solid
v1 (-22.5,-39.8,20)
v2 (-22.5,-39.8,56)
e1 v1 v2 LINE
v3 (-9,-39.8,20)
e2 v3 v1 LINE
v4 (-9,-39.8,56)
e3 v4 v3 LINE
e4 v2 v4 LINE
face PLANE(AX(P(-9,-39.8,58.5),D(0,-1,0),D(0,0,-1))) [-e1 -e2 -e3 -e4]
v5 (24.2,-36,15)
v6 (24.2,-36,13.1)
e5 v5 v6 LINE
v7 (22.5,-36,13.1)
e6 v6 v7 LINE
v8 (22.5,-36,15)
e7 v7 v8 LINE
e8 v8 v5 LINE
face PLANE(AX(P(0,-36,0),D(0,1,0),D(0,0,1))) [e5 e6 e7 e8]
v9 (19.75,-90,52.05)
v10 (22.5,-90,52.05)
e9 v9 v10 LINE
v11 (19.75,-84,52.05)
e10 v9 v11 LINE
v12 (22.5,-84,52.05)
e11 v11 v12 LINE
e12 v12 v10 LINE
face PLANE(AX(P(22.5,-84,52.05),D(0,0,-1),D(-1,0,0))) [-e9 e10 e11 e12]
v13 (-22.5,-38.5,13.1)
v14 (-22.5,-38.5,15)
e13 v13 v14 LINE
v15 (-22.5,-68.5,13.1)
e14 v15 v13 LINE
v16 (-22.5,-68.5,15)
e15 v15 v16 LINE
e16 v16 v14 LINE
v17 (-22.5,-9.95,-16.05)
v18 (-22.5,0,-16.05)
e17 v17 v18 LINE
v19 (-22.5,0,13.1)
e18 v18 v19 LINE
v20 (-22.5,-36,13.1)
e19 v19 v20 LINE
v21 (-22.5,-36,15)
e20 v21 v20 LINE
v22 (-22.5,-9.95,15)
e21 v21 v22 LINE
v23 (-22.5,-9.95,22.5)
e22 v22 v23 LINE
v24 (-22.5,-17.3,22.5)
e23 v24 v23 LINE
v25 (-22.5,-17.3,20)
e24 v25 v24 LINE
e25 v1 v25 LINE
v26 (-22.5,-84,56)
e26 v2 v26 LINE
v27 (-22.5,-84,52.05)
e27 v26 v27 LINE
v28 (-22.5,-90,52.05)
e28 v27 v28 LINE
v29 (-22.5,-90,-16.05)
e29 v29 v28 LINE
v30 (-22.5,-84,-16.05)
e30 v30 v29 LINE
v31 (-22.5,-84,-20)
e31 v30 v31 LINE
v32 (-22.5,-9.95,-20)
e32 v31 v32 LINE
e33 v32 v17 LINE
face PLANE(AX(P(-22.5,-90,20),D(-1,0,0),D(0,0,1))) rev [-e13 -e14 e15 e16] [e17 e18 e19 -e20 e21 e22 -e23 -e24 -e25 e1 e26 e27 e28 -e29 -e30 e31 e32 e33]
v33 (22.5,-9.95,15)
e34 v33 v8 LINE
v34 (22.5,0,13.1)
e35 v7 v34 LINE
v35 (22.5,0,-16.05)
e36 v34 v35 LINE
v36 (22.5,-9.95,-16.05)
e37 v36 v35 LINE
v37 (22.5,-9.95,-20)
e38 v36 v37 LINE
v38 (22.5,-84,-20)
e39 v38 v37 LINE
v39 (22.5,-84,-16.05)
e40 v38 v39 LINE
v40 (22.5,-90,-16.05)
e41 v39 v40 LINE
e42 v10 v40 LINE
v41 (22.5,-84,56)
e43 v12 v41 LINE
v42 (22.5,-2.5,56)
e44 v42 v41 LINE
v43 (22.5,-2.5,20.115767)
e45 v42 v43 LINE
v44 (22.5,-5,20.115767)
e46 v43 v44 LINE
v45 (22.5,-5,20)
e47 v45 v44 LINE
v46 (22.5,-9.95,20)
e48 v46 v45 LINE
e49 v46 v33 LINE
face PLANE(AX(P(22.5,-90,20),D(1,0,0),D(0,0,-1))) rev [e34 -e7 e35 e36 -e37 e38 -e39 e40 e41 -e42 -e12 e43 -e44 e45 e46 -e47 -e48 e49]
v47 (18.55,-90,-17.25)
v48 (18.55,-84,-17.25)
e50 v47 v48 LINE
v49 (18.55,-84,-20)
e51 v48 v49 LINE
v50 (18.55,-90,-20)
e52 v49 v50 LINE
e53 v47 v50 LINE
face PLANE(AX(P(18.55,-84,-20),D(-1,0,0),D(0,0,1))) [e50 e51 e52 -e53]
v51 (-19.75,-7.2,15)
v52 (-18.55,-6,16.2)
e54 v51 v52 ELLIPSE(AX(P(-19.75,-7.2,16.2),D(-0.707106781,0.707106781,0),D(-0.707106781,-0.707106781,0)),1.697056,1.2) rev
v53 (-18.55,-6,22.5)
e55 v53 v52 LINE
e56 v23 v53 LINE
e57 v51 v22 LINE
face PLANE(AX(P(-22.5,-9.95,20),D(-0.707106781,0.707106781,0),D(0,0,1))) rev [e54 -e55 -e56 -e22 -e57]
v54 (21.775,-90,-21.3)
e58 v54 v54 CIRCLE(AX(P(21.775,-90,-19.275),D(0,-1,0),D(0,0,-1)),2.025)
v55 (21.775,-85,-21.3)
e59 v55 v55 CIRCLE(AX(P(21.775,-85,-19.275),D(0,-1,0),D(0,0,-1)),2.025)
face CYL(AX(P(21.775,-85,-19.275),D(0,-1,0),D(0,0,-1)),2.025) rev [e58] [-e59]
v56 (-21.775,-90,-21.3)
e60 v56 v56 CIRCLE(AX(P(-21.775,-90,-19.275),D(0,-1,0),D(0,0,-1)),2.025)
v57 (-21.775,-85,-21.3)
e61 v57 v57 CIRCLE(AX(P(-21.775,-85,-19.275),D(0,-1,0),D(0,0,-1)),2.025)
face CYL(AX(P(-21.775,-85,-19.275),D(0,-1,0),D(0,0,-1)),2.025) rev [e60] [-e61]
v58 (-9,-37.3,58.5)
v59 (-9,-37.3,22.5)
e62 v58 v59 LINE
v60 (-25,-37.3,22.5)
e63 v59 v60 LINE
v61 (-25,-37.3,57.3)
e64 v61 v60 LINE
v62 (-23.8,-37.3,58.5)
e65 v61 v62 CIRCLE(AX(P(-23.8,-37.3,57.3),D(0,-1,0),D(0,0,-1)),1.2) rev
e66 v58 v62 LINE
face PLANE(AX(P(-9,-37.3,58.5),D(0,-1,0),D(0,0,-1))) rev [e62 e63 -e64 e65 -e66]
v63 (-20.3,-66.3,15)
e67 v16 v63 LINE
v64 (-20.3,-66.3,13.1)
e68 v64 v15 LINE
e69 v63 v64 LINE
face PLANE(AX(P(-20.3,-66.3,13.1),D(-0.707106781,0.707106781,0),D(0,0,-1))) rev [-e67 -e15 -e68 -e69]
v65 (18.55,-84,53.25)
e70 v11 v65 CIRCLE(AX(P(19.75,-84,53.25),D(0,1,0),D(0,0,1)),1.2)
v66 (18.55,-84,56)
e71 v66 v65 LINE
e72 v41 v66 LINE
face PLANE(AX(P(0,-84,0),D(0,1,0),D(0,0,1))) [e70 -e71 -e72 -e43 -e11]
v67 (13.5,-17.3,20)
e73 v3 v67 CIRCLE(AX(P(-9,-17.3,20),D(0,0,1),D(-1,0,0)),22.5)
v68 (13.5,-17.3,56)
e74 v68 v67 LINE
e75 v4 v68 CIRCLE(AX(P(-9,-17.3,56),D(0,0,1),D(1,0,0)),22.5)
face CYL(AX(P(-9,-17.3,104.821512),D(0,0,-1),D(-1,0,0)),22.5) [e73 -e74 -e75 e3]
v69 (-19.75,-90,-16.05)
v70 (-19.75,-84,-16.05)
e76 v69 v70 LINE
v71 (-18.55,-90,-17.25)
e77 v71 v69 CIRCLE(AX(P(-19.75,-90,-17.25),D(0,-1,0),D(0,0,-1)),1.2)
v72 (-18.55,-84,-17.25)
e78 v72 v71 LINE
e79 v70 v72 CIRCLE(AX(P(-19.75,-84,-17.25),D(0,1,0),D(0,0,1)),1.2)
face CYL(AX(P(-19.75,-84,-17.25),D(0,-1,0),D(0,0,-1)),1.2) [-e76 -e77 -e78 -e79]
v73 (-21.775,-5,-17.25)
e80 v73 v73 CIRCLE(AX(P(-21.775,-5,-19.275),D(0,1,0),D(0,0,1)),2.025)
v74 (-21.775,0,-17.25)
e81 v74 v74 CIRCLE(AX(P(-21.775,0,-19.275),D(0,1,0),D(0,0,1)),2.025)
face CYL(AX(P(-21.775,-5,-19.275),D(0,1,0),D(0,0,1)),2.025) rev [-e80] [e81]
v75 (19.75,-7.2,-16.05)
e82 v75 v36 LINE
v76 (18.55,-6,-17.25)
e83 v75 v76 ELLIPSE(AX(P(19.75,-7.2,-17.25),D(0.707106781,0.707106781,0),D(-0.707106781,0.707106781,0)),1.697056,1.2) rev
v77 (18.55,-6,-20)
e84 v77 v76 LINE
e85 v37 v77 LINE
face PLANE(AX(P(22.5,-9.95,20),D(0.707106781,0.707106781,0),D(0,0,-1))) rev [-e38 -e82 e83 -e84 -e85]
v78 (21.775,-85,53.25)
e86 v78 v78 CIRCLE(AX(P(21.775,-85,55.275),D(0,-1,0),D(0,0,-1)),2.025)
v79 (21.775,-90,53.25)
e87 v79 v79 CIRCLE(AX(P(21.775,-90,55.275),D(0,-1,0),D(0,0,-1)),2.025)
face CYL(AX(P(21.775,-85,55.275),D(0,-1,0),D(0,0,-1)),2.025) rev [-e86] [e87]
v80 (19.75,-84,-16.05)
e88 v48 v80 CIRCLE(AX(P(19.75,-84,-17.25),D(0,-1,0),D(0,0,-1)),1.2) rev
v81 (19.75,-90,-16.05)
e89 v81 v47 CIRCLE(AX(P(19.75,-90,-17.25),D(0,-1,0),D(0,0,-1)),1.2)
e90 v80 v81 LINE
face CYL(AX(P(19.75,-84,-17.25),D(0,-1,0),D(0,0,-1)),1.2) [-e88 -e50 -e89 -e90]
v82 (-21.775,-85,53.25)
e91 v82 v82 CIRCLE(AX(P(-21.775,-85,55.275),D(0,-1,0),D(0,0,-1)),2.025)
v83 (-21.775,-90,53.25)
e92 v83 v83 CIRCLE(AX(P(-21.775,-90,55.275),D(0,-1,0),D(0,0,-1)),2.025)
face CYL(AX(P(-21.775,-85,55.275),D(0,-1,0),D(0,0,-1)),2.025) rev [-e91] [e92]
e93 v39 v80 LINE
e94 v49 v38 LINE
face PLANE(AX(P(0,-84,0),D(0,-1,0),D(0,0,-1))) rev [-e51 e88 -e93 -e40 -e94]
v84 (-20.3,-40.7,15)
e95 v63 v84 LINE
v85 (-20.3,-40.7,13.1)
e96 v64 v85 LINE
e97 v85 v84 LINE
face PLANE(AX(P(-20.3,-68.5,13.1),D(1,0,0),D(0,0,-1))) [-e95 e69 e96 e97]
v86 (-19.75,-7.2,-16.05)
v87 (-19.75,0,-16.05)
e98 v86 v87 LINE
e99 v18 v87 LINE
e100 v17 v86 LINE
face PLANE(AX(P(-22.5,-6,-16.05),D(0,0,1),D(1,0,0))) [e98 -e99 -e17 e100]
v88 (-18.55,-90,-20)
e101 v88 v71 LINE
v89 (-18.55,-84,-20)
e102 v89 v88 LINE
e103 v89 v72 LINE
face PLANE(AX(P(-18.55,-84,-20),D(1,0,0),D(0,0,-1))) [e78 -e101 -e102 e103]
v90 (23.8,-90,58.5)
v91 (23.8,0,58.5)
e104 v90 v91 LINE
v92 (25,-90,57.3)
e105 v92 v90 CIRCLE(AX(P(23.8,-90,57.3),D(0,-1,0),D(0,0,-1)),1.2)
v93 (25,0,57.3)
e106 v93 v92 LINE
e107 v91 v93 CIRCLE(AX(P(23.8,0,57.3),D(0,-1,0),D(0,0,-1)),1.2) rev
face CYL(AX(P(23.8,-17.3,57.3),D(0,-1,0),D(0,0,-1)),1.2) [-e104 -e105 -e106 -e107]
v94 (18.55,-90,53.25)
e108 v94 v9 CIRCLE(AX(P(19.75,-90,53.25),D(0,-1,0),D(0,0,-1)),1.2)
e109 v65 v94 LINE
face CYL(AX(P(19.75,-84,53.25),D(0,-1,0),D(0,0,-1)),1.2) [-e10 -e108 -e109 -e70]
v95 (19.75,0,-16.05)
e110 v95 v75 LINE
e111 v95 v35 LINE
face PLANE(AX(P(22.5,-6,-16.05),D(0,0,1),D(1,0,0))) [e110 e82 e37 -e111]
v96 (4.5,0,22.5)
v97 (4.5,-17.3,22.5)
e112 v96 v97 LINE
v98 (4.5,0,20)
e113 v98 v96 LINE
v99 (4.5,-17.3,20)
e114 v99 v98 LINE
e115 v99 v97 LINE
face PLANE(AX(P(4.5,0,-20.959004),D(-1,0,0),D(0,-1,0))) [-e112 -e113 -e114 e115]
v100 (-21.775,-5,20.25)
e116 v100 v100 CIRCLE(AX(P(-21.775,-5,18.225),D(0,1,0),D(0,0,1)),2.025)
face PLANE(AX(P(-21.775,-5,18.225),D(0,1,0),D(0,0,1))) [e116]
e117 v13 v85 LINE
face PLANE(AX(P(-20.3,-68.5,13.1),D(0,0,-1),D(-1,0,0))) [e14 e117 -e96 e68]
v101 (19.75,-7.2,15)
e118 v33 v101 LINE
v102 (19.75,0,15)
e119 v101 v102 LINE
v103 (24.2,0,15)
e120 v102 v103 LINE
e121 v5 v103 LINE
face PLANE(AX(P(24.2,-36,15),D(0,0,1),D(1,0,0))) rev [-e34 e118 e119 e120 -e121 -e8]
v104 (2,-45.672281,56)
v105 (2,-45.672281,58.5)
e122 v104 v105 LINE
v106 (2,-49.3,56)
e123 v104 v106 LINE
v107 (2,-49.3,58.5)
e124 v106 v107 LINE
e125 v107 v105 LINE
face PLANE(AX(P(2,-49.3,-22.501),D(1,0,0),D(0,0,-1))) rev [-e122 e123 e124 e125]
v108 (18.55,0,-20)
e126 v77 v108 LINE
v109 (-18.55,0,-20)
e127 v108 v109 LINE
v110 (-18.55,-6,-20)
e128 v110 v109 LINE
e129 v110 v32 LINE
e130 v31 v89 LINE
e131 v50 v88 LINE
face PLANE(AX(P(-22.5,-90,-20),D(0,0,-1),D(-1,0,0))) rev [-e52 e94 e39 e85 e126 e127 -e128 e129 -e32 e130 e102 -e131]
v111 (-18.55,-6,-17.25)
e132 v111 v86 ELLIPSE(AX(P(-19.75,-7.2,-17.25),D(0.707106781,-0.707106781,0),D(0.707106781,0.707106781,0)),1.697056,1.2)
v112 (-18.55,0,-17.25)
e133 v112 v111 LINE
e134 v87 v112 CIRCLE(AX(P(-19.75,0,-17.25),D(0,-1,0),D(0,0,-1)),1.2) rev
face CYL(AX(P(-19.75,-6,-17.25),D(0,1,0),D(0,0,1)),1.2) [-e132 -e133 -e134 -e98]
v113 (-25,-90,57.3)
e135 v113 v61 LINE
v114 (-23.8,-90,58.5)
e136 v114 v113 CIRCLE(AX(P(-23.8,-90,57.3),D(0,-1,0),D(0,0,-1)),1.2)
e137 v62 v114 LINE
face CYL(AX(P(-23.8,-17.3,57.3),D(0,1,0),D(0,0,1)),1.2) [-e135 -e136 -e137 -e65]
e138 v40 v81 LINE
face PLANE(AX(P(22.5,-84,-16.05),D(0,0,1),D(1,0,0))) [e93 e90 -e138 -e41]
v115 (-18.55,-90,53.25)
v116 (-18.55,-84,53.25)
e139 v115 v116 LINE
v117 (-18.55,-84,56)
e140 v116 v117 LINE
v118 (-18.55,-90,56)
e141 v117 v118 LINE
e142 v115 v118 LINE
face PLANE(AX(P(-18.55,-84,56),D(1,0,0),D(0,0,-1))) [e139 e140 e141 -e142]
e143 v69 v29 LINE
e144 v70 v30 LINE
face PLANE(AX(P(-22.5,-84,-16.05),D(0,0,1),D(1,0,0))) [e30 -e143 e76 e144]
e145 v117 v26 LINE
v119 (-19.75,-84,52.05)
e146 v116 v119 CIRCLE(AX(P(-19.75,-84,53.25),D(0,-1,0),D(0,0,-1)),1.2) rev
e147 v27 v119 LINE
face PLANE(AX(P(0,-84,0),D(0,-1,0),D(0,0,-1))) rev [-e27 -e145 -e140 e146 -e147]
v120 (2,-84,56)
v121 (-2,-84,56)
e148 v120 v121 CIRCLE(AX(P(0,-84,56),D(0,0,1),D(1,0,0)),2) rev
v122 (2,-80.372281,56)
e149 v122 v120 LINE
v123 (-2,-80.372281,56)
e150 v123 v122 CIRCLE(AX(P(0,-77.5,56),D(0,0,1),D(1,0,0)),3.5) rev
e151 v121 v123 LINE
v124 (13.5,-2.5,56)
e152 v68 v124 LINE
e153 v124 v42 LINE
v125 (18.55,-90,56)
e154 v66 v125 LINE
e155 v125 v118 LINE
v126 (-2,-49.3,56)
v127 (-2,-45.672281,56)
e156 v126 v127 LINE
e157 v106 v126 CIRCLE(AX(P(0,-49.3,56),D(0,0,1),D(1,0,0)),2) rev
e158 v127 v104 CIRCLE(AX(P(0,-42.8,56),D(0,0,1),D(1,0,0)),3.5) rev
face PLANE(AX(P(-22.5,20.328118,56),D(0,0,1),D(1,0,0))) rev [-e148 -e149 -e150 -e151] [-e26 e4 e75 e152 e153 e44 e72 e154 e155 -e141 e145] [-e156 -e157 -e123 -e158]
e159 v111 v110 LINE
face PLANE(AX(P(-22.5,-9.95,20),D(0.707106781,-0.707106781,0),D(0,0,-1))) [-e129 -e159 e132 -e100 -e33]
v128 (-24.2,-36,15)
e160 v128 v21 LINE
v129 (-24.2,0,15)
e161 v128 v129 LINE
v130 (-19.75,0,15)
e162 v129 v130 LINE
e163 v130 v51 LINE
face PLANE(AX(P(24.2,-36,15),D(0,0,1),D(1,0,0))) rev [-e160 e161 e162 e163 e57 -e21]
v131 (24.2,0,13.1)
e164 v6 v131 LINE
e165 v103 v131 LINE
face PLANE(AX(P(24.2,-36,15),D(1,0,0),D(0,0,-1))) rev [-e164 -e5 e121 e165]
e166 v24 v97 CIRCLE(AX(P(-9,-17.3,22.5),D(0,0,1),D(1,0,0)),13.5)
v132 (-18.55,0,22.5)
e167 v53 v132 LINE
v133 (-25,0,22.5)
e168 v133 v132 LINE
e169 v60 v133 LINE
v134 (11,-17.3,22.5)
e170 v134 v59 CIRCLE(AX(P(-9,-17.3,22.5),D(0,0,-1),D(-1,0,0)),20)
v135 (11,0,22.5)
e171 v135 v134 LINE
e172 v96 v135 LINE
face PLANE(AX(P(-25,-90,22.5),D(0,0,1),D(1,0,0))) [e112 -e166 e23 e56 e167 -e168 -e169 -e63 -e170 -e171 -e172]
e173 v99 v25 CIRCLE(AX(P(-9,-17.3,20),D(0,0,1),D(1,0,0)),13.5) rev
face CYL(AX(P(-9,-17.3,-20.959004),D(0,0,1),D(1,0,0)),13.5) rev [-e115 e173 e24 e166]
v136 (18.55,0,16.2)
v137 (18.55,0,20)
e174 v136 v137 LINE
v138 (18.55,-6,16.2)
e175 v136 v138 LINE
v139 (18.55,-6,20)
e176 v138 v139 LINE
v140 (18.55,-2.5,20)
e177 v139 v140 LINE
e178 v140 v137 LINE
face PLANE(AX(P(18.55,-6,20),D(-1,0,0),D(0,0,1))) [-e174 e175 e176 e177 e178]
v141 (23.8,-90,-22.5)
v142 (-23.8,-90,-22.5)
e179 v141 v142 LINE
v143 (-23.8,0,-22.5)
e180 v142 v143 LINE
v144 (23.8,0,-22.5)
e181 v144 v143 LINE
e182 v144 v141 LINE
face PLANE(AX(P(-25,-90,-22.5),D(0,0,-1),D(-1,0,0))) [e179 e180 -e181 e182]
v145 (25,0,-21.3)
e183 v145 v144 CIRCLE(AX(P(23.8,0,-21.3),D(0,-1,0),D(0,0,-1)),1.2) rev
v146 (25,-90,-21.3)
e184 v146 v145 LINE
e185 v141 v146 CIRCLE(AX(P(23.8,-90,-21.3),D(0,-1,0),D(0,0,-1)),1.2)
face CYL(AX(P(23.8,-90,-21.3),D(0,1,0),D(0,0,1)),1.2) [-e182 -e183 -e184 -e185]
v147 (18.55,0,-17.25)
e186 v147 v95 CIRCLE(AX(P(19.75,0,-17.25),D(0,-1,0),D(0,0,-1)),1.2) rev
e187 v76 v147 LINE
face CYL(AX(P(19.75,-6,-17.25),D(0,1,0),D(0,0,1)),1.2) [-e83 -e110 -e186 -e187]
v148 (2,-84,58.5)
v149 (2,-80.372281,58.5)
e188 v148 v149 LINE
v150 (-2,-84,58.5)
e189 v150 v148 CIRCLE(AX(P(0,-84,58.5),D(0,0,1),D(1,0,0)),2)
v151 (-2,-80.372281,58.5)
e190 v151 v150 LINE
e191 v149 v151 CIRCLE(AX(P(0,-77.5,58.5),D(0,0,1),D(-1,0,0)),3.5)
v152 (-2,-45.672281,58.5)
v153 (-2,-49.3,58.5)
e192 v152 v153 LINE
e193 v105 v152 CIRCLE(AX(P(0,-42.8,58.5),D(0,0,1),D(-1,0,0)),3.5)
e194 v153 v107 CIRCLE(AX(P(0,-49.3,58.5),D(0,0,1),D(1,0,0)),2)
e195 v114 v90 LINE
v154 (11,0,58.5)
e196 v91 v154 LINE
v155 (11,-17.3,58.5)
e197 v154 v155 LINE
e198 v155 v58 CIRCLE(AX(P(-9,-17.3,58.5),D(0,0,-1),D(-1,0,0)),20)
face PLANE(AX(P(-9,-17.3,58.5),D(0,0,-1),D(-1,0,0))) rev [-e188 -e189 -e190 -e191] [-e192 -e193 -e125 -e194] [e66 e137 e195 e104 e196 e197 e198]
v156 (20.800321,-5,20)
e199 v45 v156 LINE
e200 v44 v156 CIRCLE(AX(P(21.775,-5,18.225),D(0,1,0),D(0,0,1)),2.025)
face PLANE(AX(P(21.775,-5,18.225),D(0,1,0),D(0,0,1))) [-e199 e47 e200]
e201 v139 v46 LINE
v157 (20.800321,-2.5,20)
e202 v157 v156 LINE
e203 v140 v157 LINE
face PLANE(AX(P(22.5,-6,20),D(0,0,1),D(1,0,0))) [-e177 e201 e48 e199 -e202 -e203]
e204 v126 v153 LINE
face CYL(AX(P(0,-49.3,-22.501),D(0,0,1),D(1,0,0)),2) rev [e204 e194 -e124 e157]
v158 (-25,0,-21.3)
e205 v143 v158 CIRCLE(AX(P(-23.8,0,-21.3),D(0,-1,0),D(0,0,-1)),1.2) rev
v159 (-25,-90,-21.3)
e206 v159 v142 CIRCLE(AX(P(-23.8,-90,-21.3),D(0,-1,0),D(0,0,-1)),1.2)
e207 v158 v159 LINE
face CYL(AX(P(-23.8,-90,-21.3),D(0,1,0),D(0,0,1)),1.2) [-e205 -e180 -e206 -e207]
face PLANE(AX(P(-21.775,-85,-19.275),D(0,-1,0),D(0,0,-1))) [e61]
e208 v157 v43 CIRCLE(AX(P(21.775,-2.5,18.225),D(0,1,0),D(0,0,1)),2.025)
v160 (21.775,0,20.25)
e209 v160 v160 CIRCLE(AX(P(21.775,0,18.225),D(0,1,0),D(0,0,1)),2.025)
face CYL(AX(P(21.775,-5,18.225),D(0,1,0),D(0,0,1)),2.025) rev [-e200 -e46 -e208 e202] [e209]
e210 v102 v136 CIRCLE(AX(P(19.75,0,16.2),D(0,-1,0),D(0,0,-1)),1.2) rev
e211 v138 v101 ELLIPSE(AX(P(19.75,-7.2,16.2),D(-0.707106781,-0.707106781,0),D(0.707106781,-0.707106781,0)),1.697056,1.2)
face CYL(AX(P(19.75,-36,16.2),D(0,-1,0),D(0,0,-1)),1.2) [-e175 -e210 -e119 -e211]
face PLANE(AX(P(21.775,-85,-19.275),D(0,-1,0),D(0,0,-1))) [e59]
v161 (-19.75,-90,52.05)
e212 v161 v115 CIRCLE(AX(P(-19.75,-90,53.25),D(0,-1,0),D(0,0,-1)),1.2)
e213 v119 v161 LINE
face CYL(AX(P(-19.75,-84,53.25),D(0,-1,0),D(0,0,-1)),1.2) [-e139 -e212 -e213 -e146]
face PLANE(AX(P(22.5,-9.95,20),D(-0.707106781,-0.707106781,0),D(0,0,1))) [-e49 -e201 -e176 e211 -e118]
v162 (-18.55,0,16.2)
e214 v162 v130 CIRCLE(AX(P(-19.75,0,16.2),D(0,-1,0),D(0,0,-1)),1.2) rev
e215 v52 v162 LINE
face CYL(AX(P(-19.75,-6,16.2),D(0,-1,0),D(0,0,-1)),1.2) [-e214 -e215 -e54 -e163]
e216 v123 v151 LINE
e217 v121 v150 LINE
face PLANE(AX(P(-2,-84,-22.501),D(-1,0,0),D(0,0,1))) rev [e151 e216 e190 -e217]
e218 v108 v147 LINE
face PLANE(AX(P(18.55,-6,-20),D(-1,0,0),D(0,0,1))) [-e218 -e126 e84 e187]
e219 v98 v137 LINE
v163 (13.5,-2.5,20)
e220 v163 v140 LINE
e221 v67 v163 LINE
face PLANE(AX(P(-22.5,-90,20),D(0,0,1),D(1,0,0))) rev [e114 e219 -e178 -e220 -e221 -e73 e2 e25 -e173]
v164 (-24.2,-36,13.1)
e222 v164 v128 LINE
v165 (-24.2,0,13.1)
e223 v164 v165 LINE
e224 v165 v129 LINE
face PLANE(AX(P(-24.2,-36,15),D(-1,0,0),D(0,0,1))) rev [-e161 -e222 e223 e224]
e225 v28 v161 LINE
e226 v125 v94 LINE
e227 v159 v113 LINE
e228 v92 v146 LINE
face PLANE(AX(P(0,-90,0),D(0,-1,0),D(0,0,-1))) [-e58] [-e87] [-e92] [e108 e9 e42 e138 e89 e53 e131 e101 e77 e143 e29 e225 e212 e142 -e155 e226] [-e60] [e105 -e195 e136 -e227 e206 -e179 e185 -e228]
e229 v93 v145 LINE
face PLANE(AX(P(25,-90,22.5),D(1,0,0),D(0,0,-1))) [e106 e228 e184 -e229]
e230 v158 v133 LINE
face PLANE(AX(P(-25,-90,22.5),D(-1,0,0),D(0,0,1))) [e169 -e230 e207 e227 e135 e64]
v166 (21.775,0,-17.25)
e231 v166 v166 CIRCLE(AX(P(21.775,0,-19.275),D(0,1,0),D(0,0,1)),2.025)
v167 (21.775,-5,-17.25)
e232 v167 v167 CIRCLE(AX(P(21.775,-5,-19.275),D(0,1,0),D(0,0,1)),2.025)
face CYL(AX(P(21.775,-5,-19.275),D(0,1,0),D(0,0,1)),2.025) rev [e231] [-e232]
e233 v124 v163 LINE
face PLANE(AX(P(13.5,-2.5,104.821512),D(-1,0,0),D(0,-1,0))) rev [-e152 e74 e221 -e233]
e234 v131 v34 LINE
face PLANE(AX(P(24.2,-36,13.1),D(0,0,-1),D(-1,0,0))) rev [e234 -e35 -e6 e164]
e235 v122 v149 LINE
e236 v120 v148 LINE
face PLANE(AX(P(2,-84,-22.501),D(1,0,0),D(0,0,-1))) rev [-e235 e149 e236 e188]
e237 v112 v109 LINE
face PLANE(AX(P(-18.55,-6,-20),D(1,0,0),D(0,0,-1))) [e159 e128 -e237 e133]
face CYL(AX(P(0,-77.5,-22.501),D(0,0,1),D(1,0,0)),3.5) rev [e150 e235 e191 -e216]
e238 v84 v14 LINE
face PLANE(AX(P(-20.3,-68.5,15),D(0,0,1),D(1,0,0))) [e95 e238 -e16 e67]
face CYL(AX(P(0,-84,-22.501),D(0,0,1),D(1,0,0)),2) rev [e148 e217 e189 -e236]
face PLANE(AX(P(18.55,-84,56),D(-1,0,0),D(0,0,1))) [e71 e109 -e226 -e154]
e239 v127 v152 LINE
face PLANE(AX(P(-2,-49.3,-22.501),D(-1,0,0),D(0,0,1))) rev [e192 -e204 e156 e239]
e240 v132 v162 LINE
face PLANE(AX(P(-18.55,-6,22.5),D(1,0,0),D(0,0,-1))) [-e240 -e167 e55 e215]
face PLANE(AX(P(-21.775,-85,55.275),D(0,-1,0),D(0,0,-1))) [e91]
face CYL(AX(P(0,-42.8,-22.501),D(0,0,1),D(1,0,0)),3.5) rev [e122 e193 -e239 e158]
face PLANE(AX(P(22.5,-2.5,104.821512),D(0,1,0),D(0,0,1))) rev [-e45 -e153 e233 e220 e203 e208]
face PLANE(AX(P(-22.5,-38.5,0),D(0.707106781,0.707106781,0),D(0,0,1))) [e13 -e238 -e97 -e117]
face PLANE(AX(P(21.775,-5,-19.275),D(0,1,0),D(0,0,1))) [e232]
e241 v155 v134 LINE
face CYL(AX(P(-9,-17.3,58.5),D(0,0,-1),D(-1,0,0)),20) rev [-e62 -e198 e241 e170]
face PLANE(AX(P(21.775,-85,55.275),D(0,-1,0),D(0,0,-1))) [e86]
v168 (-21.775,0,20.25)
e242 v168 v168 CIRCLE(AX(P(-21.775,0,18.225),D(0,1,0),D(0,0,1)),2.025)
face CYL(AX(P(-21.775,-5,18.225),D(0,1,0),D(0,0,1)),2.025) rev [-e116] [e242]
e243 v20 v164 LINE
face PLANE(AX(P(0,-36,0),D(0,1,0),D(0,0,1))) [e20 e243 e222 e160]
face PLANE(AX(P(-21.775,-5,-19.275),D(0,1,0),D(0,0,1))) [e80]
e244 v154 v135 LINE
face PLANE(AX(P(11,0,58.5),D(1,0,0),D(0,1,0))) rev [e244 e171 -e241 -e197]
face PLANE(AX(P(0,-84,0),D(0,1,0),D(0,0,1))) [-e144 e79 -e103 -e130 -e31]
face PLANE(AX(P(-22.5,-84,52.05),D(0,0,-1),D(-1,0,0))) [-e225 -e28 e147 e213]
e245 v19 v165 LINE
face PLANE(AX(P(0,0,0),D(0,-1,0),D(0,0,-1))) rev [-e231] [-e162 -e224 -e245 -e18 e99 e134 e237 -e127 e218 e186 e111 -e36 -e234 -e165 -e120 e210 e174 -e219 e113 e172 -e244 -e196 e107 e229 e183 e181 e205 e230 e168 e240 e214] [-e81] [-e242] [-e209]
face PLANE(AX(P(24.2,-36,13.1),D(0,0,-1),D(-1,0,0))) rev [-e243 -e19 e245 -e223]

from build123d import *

# Parameters (mm, degrees)
SKETCH_1_W          = 50
SKETCH_1_H          = 45
SKETCH_1_W_2        = 45
SKETCH_1_H_2        = 40
EXTRUDE_1_DEPTH     = 90
SKETCH_2_W          = 48.4
SKETCH_2_H          = 1.9
CUT_EXTRUDE_1_DEPTH = 36
SKETCH_3_R          = 13.5
CUT_EXTRUDE_2_DEPTH = 2.5
EXTRUDE_2_DEPTH     = 36
SKETCH_5_W          = 45
SKETCH_5_H          = 36
CUT_EXTRUDE_3_DEPTH = 50.2
CUT_EXTRUDE_4_DEPTH = 36
SKETCH_7_W          = 2.2
SKETCH_7_H          = 1.9
EXTRUDE_3_DEPTH     = 30
CHAMFER_1_SIZE      = 2.2
SKETCH_8_W          = 3.95
SKETCH_8_H          = 3.95
EXTRUDE_4_DEPTH     = 6
SKETCH_9_R          = 2.025
CUT_EXTRUDE_5_DEPTH = 5
SKETCH_10_W         = 3.95
SKETCH_10_H         = 5
SKETCH_10_H_2       = 7.5
SKETCH_10_H_3       = 3.95
EXTRUDE_5_DEPTH     = 6
CUT_EXTRUDE_START   = -5
SKETCH_11_R         = 2.025
CUT_EXTRUDE_6_DEPTH = 5
CHAMFER_2_SIZE      = 3.95
FILLET_1_R          = 1.2
CUT_EXTRUDE_7_REACH = 125.637


with BuildPart() as part:
    # 草圖1 → 填料-伸長1 (new body)
    with BuildSketch(Plane(origin=(0, 0, 0), x_dir=(1, 0, 0), z_dir=(0, 1, 0))):
        Rectangle(SKETCH_1_W, SKETCH_1_H)
        Rectangle(SKETCH_1_W_2, SKETCH_1_H_2, mode=Mode.SUBTRACT)
    extrude(amount=-EXTRUDE_1_DEPTH)

    # 草圖2 → 除料-伸長1 (cut)
    with BuildSketch(Plane(origin=(0, 0, 0), x_dir=(1, 0, 0), z_dir=(0, 1, 0))):
        with Locations((0, -14.05)):
            Rectangle(SKETCH_2_W, SKETCH_2_H)
    extrude(amount=-CUT_EXTRUDE_1_DEPTH, mode=Mode.SUBTRACT)

    # 草圖3 → 除料-伸長2 (cut)
    with BuildSketch(Plane.XY.offset(22.5)):
        with BuildLine():
            Line((-22.5, 0), (-22.5, -17.3))
            ThreePointArc((-22.5, -17.3), (-9, -3.8), (4.5, -17.3))
            Line((4.5, -17.3), (4.5, 0))
            Line((4.5, 0), (-22.5, 0))
        make_face()
        with Locations((-9, -17.3)):
            Circle(SKETCH_3_R)
    extrude(amount=-CUT_EXTRUDE_2_DEPTH, mode=Mode.SUBTRACT)

    # 草圖4 → 填料-伸長2 (add)
    with BuildSketch(Plane.XY.offset(22.5)):
        with BuildLine():
            Line((11, 0), (11, -17.3))
            ThreePointArc((11, -17.3), (5.142135624, -31.442135624), (-9, -37.3))
            Line((-9, -37.3), (-25, -37.3))
            Line((-25, -37.3), (-25, -90))
            Line((-25, -90), (25, -90))
            Line((25, -90), (25, 0))
            Line((25, 0), (11, 0))
        make_face()
    extrude(amount=EXTRUDE_2_DEPTH)

    # 草圖5 → 除料-伸長3 (cut)
    with BuildSketch(Plane(origin=(-25, -90, 58.5), x_dir=(1, 0, 0), z_dir=(0, -1, 0))):
        with Locations((25, -20.5)):
            Rectangle(SKETCH_5_W, SKETCH_5_H)
    extrude(amount=-CUT_EXTRUDE_3_DEPTH, mode=Mode.SUBTRACT)

    # 草圖6 → 除料-伸長4 (cut)
    with BuildSketch(Plane(origin=(0, 0, 20), x_dir=(-1, 0, 0), z_dir=(0, 0, -1))):
        with BuildLine():
            Line((-22.5, -2.5), (-22.5, -39.8))
            Line((-22.5, -39.8), (9, -39.8))
            ThreePointArc((9, -39.8), (-6.909902577, -33.209902577), (-13.5, -17.3))
            Line((-13.5, -17.3), (-13.5, -2.5))
            Line((-13.5, -2.5), (-22.5, -2.5))
        make_face()
    extrude(amount=-CUT_EXTRUDE_4_DEPTH, mode=Mode.SUBTRACT)

    # 草圖7 → 填料-伸長3 (add)
    with BuildSketch(Plane(origin=(0, -38.5, 0), x_dir=(1, 0, 0), z_dir=(0, 1, 0))):
        with Locations((-21.4, -14.05)):
            Rectangle(SKETCH_7_W, SKETCH_7_H)
    extrude(amount=-EXTRUDE_3_DEPTH)

    # 導角1
    chamfer_1_edges = [part.edges().sort_by_distance(p)[0] for p in [
        (-20.3, -38.5, 14.05),
        (-20.3, -68.5, 14.05),
    ]]
    chamfer(chamfer_1_edges, length=CHAMFER_1_SIZE - 0.0001)  # a hair under: the kernel refuses the full size

    # 草圖8 → 填料-伸長4 (add)
    with BuildSketch(Plane.XZ.offset(90)):
        with Locations((-20.525, 54.025)):
            Rectangle(SKETCH_8_W, SKETCH_8_H)
        with Locations((20.525, 54.025)):
            Rectangle(SKETCH_8_W, SKETCH_8_H)
        with Locations((20.525, -18.025)):
            Rectangle(SKETCH_8_W, SKETCH_8_H)
        with Locations((-20.525, -18.025)):
            Rectangle(SKETCH_8_W, SKETCH_8_H)
    extrude(amount=-EXTRUDE_4_DEPTH)

    # 草圖9 → 除料-伸長5 (cut)
    with BuildSketch(Plane.XZ.offset(90)):
        with Locations(Location((-21.775, 55.275, 0), (0, 0, 270))):
            Circle(SKETCH_9_R)
        with Locations(Location((21.775, 55.275, 0), (0, 0, 270))):
            Circle(SKETCH_9_R)
        with Locations(Location((-21.775, -19.275, 0), (0, 0, 270))):
            Circle(SKETCH_9_R)
        with Locations(Location((21.775, -19.275, 0), (0, 0, 270))):
            Circle(SKETCH_9_R)
    extrude(amount=-CUT_EXTRUDE_5_DEPTH, mode=Mode.SUBTRACT)

    # 草圖10 → 填料-伸長5 (add)
    with BuildSketch(Plane(origin=(0, 0, 0), x_dir=(1, 0, 0), z_dir=(0, 1, 0))):
        with Locations((20.525, -17.5)):
            Rectangle(SKETCH_10_W, SKETCH_10_H)
        with Locations((-20.525, -18.75)):
            Rectangle(SKETCH_10_W, SKETCH_10_H_2)
        with Locations((-20.525, 18.025)):
            Rectangle(SKETCH_10_W, SKETCH_10_H_3)
        with Locations((20.525, 18.025)):
            Rectangle(SKETCH_10_W, SKETCH_10_H_3)
    extrude(amount=-EXTRUDE_5_DEPTH)

    # 草圖11 → 除料-伸長6 (cut)
    with BuildSketch(Plane(origin=(0, 0, 0), x_dir=(1, 0, 0), z_dir=(0, 1, 0)).offset(CUT_EXTRUDE_START)):
        with Locations(Location((21.775, -18.225, 0), (0, 0, 270))):
            Circle(SKETCH_11_R)
        with Locations(Location((-21.775, -18.225, 0), (0, 0, 270))):
            Circle(SKETCH_11_R)
        with Locations(Location((21.775, 19.275, 0), (0, 0, 90))):
            Circle(SKETCH_11_R)
        with Locations(Location((-21.775, 19.275, 0), (0, 0, 90))):
            Circle(SKETCH_11_R)
    extrude(amount=CUT_EXTRUDE_6_DEPTH, mode=Mode.SUBTRACT)

    # 導角2
    chamfer_2_edges = [part.edges().sort_by_distance(p)[0] for p in [
        (-22.5, -6, 18.75),
        (22.5, -6, 17.5),
        (22.5, -6, -18.025),
        (-22.5, -6, -18.025),
    ]]
    chamfer(chamfer_2_edges, length=CHAMFER_2_SIZE - 0.0001)  # a hair under: the kernel refuses the full size

    # 圓角1
    fillet_1_edges = [part.edges().sort_by_distance(p)[0] for p in [
        (-18.55, -87, 52.05),
        (18.55, -87, 52.05),
        (18.55, -87, -16.05),
        (-18.55, -87, -16.05),
        (-18.55, -3, 15),
        (18.55, -3, 15),
        (-18.55, -3, -16.05),
        (18.55, -3, -16.05),
        (-25, -45, -22.5),
        (-25, -63.65, 58.5),
        (25, -45, 58.5),
        (25, -45, -22.5),
    ]]
    fillet(fillet_1_edges, radius=FILLET_1_R)

    # 草圖12 → 除料-伸長7 (cut, up to next)
    with BuildSketch(Plane.XY.offset(58.5), mode=Mode.PRIVATE) as cut_extrude_7_sk1:
        with BuildLine():
            Line((-2, -49.3), (-2, -45.672281323))
            ThreePointArc((-2, -45.672281323), (0, -39.3), (2, -45.672281323))
            Line((2, -45.672281323), (2, -49.3))
            ThreePointArc((2, -49.3), (0, -51.3), (-2, -49.3))
        make_face()
    cut_extrude_7_tool1 = extrude(cut_extrude_7_sk1.sketch, amount=-CUT_EXTRUDE_7_REACH, mode=Mode.PRIVATE) & part.part
    # 草圖12 → 除料-伸長7 (cut, up to next)
    with BuildSketch(Plane.XY.offset(58.5), mode=Mode.PRIVATE) as cut_extrude_7_sk2:
        with BuildLine():
            Line((-2, -84), (-2, -80.372281323))
            ThreePointArc((-2, -80.372281323), (0, -74), (2, -80.372281323))
            Line((2, -80.372281323), (2, -84))
            ThreePointArc((2, -84), (0, -86), (-2, -84))
        make_face()
    cut_extrude_7_tool2 = extrude(cut_extrude_7_sk2.sketch, amount=-CUT_EXTRUDE_7_REACH, mode=Mode.PRIVATE) & part.part
    add(cut_extrude_7_tool1.solids().sort_by_distance((0, -44.69051, 58.5))[0], mode=Mode.SUBTRACT)
    add(cut_extrude_7_tool2.solids().sort_by_distance((0, -79.39051, 58.5))[0], mode=Mode.SUBTRACT)


solid = part.part
